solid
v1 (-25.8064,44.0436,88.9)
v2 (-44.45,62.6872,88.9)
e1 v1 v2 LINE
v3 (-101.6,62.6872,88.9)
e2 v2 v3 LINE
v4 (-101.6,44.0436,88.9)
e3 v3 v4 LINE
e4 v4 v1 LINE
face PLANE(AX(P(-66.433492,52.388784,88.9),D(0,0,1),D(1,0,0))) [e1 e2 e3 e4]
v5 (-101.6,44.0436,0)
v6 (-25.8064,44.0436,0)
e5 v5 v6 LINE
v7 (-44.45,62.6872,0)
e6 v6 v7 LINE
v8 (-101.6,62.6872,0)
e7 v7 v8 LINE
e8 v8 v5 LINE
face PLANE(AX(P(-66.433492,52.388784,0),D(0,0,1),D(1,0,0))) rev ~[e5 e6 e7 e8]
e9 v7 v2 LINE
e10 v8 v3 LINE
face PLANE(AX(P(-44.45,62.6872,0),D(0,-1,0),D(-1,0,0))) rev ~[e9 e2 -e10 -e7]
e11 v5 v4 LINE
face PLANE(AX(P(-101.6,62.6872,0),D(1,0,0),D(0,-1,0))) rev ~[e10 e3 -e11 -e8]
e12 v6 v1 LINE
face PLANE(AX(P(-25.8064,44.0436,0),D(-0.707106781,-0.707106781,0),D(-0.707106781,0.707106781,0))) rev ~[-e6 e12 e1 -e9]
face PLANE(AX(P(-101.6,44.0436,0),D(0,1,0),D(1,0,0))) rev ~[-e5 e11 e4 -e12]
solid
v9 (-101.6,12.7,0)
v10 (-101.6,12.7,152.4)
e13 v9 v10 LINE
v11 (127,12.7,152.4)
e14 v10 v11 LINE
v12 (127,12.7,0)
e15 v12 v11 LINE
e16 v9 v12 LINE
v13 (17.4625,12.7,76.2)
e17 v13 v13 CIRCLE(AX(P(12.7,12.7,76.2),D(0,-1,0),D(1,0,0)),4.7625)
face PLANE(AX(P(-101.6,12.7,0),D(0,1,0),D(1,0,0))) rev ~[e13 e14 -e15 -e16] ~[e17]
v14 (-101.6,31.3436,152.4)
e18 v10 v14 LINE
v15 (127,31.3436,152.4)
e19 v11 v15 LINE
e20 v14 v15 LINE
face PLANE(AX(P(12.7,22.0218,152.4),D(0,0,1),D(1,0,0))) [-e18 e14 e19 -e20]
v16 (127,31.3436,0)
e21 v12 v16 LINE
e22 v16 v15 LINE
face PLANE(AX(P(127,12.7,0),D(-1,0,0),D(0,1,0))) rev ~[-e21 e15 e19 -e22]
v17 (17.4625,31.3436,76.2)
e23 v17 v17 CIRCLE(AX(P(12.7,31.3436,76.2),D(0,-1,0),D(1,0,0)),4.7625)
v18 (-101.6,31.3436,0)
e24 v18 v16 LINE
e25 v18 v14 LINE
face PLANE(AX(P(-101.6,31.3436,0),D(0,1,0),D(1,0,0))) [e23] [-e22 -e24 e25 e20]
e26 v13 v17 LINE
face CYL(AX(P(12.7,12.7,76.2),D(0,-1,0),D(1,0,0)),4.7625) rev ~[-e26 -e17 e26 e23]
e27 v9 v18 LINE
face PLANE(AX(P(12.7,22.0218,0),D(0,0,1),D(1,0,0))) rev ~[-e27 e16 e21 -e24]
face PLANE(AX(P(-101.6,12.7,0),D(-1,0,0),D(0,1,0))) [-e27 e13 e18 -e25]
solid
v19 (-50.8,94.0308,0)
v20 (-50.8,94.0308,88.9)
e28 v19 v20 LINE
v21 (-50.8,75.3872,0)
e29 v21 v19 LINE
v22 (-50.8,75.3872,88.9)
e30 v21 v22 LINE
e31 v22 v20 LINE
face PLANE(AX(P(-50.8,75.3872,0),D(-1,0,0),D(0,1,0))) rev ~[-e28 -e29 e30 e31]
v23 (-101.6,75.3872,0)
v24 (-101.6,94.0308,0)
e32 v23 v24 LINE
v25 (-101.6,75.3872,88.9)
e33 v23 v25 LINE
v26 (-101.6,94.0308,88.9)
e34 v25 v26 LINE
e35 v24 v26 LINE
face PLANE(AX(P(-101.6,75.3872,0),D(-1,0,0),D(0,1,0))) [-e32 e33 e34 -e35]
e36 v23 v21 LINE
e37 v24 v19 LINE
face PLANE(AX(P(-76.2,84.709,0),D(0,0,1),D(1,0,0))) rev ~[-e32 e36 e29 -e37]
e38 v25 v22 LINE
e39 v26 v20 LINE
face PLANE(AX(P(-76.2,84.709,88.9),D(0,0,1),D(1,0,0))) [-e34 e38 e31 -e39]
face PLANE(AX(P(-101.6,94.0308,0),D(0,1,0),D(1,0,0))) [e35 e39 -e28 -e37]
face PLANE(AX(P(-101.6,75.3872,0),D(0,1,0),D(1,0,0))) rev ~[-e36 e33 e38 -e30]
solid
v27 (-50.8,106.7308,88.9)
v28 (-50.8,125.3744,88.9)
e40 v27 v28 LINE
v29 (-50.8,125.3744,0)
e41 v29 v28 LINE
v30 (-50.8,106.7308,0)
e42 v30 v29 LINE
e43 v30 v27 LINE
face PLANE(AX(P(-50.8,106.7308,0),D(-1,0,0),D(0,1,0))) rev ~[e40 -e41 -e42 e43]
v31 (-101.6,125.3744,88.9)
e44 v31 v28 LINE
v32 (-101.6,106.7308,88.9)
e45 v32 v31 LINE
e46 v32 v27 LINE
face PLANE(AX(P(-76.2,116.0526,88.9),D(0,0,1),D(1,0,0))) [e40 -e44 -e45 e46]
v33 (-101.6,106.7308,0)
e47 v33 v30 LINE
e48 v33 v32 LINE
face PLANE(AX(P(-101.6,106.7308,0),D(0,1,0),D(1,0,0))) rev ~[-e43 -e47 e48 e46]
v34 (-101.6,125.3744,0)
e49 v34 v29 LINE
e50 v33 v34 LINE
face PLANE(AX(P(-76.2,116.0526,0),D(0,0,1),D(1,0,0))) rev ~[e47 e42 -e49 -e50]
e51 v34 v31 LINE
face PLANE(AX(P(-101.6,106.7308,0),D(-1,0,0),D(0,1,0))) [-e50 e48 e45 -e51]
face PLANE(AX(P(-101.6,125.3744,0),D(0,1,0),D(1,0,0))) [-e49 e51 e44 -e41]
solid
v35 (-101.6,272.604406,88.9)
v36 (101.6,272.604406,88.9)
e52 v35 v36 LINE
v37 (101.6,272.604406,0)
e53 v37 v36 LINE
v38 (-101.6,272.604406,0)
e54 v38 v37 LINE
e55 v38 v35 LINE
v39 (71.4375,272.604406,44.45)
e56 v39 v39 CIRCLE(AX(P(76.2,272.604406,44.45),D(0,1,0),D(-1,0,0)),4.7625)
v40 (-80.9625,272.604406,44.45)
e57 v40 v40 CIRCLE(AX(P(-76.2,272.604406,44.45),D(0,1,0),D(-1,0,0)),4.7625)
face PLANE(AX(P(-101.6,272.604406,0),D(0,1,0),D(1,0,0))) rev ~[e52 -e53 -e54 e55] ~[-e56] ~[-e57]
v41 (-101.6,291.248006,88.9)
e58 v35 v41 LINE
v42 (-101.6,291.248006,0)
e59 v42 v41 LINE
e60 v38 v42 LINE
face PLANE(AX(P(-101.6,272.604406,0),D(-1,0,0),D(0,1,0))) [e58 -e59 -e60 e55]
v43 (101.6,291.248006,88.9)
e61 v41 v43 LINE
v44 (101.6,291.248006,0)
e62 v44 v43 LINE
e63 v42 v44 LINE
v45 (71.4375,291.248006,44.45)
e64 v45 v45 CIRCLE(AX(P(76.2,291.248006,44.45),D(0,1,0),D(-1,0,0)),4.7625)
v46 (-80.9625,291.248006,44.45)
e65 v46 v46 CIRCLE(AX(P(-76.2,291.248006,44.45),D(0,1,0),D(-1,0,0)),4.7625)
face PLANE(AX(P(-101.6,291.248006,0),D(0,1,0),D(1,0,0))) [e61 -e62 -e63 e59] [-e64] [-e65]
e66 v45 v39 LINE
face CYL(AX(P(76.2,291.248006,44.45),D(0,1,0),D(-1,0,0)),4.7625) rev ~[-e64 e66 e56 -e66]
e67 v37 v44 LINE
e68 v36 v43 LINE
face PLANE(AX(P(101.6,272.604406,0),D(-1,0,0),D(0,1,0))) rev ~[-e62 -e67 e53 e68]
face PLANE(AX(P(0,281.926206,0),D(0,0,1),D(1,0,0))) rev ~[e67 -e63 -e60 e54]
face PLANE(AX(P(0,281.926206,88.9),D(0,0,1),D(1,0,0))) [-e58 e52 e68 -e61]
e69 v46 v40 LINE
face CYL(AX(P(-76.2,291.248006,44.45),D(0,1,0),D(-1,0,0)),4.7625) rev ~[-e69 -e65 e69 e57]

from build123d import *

# Parameters (mm, degrees)
F0_W     = 228.6
F0_H     = 18.6436
F4_DEPTH = 152.4
F1_R     = 4.7625
F2_DEPTH = 25.4
F3_DEPTH = 88.9
F0_W_2   = 50.8
F0_W_3   = 203.2
F5_R     = 4.7625
F6_DEPTH = 278.54900588


with BuildPart() as f4:
    # F0 (on Top) → F4 (new body)
    with BuildSketch(Plane.XY):
        with Locations((12.7, 22.0218)):
            Rectangle(F0_W, F0_H)
    extrude(amount=F4_DEPTH)

    # F1 (on face) → F2 (cut)
    with BuildSketch(Plane.XZ.offset(-12.7)):
        with Locations((12.7, 76.2)):
            Circle(F1_R)
    extrude(amount=-F2_DEPTH, mode=Mode.SUBTRACT)


with BuildPart() as f3:
    # F0 (on Top) → F3 (new body)
    with BuildSketch(Plane.XY):
        Polygon((-44.45, 62.6872), (-101.6, 62.6872), (-101.6, 44.0436), (-25.8064, 44.0436), align=None)
    extrude(amount=F3_DEPTH)


with BuildPart() as f3b:
    # F0 (on Top) → F3, piece 2 (new body)
    with BuildSketch(Plane.XY):
        with Locations((-76.2, 84.709)):
            Rectangle(F0_W_2, F0_H)
    extrude(amount=F3_DEPTH)


with BuildPart() as f3c:
    # F0 (on Top) → F3, piece 3 (new body)
    with BuildSketch(Plane.XY):
        with Locations((-76.2, 116.0526)):
            Rectangle(F0_W_2, F0_H)
    extrude(amount=F3_DEPTH)


with BuildPart() as f3d:
    # F0 (on Top) → F3, piece 4 (new body)
    with BuildSketch(Plane.XY):
        with Locations((0, 281.92620588)):
            Rectangle(F0_W_3, F0_H)
    extrude(amount=F3_DEPTH)

    # F5 (on face) → F6 (cut, through all)
    with BuildSketch(Plane(origin=(0, 291.24800588, 0), x_dir=(-1, 0, 0), z_dir=(0, 1, 0))):
        with Locations((76.2, 44.45)):
            Circle(F5_R)
        with Locations((-76.2, 44.45)):
            Circle(F5_R)
    extrude(amount=-F6_DEPTH, mode=Mode.SUBTRACT)


solid = Compound([f4.part, f3.part, f3b.part, f3c.part, f3d.part])
